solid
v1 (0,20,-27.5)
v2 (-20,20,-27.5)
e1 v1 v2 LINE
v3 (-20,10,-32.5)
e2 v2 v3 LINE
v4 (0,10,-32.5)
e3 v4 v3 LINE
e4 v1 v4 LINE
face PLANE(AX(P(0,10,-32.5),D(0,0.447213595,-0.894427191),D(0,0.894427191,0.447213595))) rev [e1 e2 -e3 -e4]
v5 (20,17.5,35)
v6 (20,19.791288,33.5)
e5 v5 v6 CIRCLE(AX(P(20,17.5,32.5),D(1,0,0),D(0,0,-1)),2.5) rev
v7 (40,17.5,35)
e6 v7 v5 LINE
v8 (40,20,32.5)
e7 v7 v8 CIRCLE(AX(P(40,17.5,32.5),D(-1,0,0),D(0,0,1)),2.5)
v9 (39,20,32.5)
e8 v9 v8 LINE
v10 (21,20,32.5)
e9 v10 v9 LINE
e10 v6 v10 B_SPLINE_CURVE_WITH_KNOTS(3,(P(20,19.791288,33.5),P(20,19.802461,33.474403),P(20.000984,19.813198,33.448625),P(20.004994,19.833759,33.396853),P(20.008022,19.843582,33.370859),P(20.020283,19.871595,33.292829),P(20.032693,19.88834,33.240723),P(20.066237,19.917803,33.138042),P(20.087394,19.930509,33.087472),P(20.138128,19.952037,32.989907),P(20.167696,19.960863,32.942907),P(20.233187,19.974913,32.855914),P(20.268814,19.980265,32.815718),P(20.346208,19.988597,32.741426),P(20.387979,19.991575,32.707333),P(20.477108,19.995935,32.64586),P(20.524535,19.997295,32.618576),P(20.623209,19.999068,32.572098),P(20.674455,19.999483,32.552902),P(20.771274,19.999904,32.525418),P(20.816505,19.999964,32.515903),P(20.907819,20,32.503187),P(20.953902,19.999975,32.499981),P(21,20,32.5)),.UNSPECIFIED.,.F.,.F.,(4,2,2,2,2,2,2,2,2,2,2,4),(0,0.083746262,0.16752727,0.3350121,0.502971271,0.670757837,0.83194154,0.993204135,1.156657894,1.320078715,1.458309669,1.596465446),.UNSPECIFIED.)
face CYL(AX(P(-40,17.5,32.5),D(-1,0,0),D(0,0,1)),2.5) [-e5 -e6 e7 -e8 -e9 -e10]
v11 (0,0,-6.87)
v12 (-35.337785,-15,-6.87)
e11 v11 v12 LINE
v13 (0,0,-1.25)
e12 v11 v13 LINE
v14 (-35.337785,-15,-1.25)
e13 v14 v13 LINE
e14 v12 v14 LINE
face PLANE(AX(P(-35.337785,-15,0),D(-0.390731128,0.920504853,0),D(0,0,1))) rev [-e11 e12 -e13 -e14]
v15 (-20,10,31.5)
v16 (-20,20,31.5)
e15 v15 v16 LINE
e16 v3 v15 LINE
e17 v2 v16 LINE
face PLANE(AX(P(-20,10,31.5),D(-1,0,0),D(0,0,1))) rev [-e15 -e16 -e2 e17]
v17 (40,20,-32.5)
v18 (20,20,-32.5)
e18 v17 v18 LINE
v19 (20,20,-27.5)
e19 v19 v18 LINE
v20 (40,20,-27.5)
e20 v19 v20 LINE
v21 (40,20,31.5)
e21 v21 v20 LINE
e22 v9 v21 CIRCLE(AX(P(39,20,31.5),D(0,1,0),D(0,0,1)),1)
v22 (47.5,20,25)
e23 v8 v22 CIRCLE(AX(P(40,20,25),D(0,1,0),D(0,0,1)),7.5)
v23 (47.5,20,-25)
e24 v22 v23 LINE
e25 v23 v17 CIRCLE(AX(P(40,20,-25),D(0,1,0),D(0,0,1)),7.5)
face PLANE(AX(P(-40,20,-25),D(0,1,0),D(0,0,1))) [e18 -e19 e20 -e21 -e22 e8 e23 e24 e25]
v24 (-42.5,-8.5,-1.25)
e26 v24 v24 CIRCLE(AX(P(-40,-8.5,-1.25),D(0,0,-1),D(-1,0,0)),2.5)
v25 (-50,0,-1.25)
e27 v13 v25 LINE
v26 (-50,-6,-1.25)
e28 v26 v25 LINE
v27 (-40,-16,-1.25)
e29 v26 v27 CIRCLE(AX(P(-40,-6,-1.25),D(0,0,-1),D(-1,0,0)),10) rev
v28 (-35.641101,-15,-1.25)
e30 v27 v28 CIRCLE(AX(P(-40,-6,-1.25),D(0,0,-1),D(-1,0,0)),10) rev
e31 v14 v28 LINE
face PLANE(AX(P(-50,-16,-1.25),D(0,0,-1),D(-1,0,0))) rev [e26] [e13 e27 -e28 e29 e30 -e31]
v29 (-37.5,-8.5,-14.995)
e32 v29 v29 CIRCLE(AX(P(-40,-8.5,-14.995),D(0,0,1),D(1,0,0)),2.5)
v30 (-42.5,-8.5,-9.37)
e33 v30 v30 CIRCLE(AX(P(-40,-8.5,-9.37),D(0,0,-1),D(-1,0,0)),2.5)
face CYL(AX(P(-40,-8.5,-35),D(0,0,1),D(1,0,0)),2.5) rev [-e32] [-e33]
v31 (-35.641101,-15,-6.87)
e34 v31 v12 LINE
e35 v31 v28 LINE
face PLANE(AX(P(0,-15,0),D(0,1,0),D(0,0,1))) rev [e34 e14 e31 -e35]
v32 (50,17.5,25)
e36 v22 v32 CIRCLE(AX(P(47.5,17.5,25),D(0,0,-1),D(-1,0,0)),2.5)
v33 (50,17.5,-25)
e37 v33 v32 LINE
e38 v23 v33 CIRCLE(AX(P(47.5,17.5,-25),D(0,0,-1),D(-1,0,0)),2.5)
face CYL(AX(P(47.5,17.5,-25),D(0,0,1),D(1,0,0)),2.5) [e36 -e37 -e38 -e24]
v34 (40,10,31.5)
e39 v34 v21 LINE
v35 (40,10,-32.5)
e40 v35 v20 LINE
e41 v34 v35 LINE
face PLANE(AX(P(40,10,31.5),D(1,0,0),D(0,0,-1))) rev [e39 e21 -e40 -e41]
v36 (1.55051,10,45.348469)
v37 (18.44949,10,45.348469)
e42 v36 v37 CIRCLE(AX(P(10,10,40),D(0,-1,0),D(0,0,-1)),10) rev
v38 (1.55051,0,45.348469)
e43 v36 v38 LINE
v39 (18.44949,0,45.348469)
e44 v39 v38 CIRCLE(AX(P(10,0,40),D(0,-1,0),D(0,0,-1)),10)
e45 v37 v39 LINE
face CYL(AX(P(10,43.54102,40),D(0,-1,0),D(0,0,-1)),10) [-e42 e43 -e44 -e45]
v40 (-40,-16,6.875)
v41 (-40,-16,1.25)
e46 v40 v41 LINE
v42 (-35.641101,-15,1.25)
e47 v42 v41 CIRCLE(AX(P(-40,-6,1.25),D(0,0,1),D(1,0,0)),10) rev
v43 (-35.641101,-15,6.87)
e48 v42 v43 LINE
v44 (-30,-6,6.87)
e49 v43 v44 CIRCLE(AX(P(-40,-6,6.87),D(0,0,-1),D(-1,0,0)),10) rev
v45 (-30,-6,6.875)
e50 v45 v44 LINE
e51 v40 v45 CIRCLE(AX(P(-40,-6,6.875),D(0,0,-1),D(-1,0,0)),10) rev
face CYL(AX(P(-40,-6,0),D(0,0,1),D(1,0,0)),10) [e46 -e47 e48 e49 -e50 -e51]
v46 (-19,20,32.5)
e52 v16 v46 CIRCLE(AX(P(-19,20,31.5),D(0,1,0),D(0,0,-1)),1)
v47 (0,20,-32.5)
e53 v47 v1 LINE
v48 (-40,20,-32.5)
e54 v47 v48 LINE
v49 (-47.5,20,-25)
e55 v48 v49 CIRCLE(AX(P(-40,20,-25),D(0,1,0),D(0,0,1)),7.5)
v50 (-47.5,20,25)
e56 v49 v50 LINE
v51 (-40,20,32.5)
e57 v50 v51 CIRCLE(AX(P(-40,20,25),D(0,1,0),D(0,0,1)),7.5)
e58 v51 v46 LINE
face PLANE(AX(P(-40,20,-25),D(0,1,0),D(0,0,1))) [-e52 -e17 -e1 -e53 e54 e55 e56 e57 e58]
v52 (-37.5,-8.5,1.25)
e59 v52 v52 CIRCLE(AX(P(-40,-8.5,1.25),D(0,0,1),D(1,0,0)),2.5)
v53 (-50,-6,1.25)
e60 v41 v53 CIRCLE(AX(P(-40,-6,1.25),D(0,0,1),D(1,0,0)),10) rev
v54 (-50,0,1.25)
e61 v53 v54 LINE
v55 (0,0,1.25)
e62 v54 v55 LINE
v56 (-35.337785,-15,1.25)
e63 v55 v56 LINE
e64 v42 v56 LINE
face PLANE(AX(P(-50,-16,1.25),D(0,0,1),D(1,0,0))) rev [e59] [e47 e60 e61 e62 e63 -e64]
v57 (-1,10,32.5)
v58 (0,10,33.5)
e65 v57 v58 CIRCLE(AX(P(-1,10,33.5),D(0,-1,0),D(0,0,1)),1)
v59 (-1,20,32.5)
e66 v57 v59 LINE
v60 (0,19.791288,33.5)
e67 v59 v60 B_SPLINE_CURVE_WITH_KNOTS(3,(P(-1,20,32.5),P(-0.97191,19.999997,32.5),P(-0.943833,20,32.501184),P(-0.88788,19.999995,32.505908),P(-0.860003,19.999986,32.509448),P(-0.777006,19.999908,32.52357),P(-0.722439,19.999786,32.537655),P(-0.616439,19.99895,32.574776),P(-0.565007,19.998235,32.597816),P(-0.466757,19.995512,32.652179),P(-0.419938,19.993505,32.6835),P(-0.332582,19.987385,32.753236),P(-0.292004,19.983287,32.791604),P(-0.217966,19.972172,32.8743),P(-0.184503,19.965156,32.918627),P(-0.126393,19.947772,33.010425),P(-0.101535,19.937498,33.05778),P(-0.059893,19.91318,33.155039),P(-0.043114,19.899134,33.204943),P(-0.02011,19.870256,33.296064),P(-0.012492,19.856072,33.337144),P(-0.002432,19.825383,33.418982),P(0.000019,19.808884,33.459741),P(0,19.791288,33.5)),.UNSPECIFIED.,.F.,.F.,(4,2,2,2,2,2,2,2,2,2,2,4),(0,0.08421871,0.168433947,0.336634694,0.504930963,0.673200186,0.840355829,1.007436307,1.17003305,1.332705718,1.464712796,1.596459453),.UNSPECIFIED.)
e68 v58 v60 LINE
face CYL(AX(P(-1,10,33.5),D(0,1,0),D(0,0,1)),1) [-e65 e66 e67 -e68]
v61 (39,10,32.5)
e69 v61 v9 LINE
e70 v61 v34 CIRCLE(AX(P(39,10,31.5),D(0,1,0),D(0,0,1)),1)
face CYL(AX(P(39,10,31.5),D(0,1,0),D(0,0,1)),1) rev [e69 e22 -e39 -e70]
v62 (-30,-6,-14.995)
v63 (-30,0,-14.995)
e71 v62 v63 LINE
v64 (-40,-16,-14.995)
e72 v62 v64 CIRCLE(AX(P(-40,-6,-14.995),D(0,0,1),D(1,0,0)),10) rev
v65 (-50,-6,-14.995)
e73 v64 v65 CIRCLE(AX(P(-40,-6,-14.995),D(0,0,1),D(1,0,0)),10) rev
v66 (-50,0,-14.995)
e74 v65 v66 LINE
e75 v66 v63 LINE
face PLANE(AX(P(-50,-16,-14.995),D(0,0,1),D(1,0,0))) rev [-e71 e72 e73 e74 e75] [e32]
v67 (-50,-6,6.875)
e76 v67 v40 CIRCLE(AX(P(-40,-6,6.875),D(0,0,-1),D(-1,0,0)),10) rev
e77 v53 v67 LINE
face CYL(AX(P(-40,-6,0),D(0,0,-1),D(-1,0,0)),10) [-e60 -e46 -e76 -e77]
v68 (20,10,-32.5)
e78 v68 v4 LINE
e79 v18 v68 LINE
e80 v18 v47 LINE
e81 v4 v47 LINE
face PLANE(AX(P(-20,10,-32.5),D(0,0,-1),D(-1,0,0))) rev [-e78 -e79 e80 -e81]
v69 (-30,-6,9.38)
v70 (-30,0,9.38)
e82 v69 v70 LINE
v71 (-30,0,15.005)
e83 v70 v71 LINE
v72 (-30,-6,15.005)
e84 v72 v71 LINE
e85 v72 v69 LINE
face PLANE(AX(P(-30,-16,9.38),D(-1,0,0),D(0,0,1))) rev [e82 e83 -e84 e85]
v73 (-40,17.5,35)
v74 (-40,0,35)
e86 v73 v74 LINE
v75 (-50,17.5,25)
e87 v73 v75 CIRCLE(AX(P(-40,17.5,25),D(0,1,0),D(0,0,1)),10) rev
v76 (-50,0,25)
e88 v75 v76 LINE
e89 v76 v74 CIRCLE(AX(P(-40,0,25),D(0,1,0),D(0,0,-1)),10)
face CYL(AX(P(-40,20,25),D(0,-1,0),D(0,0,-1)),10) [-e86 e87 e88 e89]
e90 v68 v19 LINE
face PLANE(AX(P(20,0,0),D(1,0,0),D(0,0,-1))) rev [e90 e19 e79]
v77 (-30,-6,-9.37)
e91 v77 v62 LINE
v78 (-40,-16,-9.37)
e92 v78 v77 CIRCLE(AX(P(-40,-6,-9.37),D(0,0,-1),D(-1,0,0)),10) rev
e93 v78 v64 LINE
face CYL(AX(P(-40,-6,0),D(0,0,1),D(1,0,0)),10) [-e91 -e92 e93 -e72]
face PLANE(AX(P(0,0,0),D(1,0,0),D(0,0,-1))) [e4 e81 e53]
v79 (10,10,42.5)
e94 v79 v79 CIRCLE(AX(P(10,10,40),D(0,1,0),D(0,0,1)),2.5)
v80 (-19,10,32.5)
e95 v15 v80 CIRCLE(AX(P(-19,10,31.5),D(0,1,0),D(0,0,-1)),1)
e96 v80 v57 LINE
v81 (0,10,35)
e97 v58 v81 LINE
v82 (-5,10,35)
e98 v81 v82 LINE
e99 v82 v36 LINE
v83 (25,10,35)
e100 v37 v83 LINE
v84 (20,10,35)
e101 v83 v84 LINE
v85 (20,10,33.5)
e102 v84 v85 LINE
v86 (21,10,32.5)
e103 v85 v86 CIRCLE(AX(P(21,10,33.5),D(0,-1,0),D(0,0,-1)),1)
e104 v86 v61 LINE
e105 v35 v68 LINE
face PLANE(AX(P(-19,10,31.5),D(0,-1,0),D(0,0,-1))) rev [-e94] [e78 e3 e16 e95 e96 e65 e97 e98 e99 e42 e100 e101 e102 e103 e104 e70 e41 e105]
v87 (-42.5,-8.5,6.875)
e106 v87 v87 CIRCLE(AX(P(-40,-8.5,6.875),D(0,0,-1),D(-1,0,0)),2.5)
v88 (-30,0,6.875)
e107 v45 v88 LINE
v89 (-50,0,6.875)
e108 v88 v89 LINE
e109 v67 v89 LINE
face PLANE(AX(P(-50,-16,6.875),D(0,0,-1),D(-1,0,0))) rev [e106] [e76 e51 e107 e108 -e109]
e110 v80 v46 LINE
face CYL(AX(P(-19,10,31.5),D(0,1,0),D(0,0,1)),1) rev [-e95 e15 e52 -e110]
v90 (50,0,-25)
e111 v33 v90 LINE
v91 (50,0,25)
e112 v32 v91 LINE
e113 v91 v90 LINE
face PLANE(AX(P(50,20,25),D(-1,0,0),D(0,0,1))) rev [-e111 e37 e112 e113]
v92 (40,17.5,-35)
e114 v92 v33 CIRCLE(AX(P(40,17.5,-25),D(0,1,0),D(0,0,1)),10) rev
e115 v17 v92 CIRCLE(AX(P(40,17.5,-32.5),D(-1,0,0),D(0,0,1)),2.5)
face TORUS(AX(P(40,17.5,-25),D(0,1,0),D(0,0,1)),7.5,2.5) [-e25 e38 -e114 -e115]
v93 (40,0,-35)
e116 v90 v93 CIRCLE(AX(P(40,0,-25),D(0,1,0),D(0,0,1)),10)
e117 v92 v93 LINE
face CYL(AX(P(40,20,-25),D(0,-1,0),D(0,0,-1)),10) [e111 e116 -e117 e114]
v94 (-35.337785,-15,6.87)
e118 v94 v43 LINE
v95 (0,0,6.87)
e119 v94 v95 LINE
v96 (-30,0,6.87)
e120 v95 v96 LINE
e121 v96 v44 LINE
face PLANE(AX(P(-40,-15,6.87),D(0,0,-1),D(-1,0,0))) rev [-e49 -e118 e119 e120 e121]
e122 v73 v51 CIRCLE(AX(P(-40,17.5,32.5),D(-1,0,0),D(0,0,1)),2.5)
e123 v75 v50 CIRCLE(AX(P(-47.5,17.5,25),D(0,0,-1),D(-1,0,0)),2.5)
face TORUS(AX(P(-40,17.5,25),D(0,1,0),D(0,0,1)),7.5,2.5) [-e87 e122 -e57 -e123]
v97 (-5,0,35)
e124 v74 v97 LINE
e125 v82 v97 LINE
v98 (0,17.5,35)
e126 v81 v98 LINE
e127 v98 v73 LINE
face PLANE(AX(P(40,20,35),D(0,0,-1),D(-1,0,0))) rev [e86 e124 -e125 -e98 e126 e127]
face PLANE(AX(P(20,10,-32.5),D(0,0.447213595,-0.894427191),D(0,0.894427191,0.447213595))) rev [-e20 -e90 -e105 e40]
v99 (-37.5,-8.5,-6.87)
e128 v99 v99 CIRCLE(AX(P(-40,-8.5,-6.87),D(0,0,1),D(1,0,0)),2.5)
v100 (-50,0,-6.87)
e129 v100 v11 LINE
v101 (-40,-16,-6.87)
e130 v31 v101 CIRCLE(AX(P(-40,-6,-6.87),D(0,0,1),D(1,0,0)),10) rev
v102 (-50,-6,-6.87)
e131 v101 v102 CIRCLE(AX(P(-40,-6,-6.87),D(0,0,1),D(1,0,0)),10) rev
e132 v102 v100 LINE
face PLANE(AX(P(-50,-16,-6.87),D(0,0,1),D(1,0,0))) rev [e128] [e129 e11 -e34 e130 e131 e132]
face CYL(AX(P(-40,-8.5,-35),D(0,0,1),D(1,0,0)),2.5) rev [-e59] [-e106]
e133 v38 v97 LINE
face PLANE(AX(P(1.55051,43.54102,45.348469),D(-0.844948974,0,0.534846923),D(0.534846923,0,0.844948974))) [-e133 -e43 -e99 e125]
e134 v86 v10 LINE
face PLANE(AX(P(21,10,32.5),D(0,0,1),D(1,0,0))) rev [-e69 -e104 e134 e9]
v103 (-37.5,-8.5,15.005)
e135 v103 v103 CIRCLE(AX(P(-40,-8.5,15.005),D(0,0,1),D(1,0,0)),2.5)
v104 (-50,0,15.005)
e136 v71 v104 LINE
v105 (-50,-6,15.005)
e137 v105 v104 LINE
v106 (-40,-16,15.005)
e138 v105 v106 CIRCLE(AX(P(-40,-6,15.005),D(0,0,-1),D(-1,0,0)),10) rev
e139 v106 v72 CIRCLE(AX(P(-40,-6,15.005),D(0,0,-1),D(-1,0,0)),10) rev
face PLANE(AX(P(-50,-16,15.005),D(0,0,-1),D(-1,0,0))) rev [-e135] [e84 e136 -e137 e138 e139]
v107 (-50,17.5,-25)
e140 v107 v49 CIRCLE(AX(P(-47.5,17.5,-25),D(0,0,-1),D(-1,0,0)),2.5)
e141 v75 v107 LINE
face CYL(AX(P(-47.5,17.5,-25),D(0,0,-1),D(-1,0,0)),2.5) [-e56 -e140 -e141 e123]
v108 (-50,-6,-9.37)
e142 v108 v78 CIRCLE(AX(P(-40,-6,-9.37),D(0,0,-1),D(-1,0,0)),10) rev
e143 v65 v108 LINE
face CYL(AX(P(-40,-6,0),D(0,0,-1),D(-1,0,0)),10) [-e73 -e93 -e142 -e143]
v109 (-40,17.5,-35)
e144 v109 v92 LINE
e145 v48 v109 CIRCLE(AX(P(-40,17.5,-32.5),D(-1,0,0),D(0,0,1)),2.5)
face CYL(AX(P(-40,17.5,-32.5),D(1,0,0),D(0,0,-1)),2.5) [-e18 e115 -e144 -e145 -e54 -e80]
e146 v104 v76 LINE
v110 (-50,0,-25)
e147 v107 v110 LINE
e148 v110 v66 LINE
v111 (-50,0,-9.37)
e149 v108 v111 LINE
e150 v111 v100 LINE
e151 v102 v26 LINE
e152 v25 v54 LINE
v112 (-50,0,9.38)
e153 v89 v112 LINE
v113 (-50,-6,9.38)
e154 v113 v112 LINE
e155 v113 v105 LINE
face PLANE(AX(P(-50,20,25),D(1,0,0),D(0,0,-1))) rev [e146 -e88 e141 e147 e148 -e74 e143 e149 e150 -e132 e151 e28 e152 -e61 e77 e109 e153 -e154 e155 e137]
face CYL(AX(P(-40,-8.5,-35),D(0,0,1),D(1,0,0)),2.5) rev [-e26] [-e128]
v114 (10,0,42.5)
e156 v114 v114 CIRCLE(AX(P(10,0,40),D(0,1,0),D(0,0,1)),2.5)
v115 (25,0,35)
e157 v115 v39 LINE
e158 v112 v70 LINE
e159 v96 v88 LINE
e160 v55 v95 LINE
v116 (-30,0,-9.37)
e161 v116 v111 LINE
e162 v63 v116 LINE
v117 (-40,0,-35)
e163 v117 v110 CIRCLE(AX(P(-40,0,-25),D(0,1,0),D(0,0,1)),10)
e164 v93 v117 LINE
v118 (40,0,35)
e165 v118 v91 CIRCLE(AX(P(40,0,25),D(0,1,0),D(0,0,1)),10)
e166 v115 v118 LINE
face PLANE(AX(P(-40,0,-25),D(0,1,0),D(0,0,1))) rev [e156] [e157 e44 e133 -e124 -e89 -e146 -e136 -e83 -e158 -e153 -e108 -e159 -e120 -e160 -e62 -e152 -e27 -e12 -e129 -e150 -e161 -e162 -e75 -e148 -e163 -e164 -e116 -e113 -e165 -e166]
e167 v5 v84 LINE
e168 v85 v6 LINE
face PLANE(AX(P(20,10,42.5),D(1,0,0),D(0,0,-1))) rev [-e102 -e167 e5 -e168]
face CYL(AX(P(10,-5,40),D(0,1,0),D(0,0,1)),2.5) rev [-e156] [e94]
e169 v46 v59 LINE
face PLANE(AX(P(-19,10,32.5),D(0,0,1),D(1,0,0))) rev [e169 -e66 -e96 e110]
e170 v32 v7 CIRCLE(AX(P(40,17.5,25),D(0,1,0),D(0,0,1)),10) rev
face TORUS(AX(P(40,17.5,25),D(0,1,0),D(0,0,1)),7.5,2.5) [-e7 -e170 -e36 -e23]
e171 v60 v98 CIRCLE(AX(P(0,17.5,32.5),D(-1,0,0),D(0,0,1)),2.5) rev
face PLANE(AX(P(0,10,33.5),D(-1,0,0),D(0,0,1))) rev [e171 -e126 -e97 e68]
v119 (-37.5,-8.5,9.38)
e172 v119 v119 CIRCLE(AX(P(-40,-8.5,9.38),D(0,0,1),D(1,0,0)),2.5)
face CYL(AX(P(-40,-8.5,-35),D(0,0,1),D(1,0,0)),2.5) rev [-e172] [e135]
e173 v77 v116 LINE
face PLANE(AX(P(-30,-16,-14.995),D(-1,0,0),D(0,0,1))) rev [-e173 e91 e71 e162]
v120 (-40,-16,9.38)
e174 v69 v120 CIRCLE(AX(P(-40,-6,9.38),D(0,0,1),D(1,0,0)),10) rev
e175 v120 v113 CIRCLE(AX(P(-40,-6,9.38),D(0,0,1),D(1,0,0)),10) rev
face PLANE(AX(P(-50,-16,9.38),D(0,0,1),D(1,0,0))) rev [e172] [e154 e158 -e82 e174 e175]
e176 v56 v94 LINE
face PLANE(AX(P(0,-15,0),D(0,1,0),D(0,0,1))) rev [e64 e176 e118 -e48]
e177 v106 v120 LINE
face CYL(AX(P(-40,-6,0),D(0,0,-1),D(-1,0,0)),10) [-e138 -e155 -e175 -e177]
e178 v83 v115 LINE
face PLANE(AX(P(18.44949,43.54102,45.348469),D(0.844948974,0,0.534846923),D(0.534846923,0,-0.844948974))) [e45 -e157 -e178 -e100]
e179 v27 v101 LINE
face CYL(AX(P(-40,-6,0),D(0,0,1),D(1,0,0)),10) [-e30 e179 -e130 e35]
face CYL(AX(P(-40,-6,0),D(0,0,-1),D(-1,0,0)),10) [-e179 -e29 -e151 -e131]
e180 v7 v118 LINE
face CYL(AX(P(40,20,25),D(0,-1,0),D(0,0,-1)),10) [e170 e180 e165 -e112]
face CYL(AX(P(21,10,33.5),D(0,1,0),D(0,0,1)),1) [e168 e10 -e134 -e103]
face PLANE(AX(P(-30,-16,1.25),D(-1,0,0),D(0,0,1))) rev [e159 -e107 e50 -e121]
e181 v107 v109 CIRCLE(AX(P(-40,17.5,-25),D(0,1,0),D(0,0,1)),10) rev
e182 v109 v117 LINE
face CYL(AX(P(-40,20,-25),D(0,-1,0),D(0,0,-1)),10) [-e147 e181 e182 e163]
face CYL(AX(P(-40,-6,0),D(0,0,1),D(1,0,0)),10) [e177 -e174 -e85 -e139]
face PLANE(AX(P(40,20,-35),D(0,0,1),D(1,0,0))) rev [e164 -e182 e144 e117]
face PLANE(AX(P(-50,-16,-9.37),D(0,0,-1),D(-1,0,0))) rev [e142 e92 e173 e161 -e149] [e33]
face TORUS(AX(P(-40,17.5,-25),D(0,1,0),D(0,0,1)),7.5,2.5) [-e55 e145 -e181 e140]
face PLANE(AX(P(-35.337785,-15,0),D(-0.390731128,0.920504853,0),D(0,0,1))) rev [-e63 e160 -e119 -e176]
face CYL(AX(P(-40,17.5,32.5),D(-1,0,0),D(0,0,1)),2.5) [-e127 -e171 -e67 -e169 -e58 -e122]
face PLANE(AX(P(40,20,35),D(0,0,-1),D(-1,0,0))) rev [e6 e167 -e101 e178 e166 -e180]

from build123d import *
from OCP.BRepFilletAPI import BRepFilletAPI_MakeChamfer

# Parameters (mm, degrees)
BOSS_EXTRUDE1_DEPTH = 20
FILLET1_R           = 2.5
SKETCH3_W           = 20
SKETCH3_H           = 5.625
SKETCH3_H_2         = 5.62
BOSS_EXTRUDE2_DEPTH = 16
FILLET2_R           = 10
SKETCH4_R           = 2.5
CUT_EXTRUDE1_DEPTH  = 74.488094444
SKETCH5_W           = 40
SKETCH5_H           = 5.62
BOSS_EXTRUDE3_DEPTH = 15
CHAMFER1_SIZE       = 35.337785487
CHAMFER1_SIZE_2     = 15
SKETCH6_R           = 2.5
CUT_EXTRUDE2_DEPTH  = 74.488094444
CUT_EXTRUDE3_DEPTH  = 10
BOSS_EXTRUDE4_DEPTH = 20
BOSS_EXTRUDE5_DEPTH = 20
BOSS_EXTRUDE6_DEPTH = 10
SKETCH12_R          = 2.5
CUT_EXTRUDE5_DEPTH  = 15


with BuildPart() as part:
    # Sketch1 → Boss-Extrude1 (new body)
    with BuildSketch(Plane(origin=(0, 0, 0), x_dir=(1, 0, 0), z_dir=(0, 1, 0))):
        with BuildLine():
            Line((40, -35), (-40, -35))
            ThreePointArc((-40, -35), (-47.071067812, -32.071067812), (-50, -25))
            Line((-50, -25), (-50, 25))
            ThreePointArc((-50, 25), (-47.071067812, 32.071067812), (-40, 35))
            Line((-40, 35), (40, 35))
            ThreePointArc((40, 35), (47.071067812, 32.071067812), (50, 25))
            Line((50, 25), (50, -25))
            ThreePointArc((50, -25), (47.071067812, -32.071067812), (40, -35))
        make_face()
    extrude(amount=BOSS_EXTRUDE1_DEPTH)

    # Fillet1
    fillet1_edges = [part.edges().sort_by_distance(p)[0] for p in [
        (-47.071067812, 20, 32.071067812),
        (0, 20, 35),
        (47.071067812, 20, 32.071067812),
        (50, 20, 0),
        (47.071067812, 20, -32.071067812),
        (0, 20, -35),
        (-47.071067812, 20, -32.071067812),
        (-50, 20, 0),
    ]]
    fillet(fillet1_edges, radius=FILLET1_R)

    # Sketch3 → Boss-Extrude2 (add)
    with BuildSketch(Plane.XZ):
        with Locations((-40, 4.0625)):
            Rectangle(SKETCH3_W, SKETCH3_H)
        with Locations((-40, 12.1925)):
            Rectangle(SKETCH3_W, SKETCH3_H)
        with Locations((-40, -12.1825)):
            Rectangle(SKETCH3_W, SKETCH3_H)
        with Locations((-40, -4.06)):
            Rectangle(SKETCH3_W, SKETCH3_H_2)
    extrude(amount=BOSS_EXTRUDE2_DEPTH)

    # Fillet2
    fillet2_edges = [part.edges().sort_by_distance(p)[0] for p in [
        (-30, -16, -12.1825),
        (-30, -16, -4.06),
        (-30, -16, 4.0625),
        (-30, -16, 12.1925),
        (-50, -16, -12.1825),
        (-50, -16, -4.06),
        (-50, -16, 4.0625),
        (-50, -16, 12.1925),
    ]]
    fillet(fillet2_edges, radius=FILLET2_R - 0.0001)  # a hair under: the kernel refuses the full size

    # Sketch4 → Cut-Extrude1 (cut, through all)
    with BuildSketch(Plane.XY.offset(15.005)):
        with Locations((-40, -8.5)):
            Circle(SKETCH4_R)
    extrude(amount=-CUT_EXTRUDE1_DEPTH, mode=Mode.SUBTRACT)

    # Sketch5 → Boss-Extrude3 (add)
    with BuildSketch(Plane.XZ):
        with Locations((-20, 4.06)):
            Rectangle(SKETCH5_W, SKETCH5_H)
        with Locations((-20, -4.06)):
            Rectangle(SKETCH5_W, SKETCH5_H)
    extrude(amount=BOSS_EXTRUDE3_DEPTH)

    # Chamfer1
    chamfer1_edges_1 = [part.edges().sort_by_distance(p)[0] for p in [
        (0, -15, -4.06),
    ]]
    chamfer1_side_1 = [part.faces().sort_by_distance(p)[0] for p in [
        (-0.3, -15, -4.06),
    ]]
    chamfer1_edges_2 = [part.edges().sort_by_distance(p)[0] for p in [
        (0, -15, 4.06),
    ]]
    chamfer1_side_2 = [part.faces().sort_by_distance(p)[0] for p in [
        (0, -14.7, 4.06),
    ]]
    chamfer1 = BRepFilletAPI_MakeChamfer(part.part.solid().wrapped)
    for e in chamfer1_edges_1:
        chamfer1.Add(CHAMFER1_SIZE - 0.0001, CHAMFER1_SIZE_2 - 0.0001, e.wrapped, chamfer1_side_1[0].wrapped)
    for e in chamfer1_edges_2:
        chamfer1.Add(CHAMFER1_SIZE_2 - 0.0001, CHAMFER1_SIZE - 0.0001, e.wrapped, chamfer1_side_2[0].wrapped)
    add(Compound.cast(chamfer1.Shape()), mode=Mode.REPLACE)  # a hair under: the kernel refuses the full size

    # Sketch6 → Cut-Extrude2 (cut, through all)
    with BuildSketch(Plane.XY.offset(15.005)):
        with Locations((-40, -8.5)):
            Circle(SKETCH6_R)
    extrude(amount=-CUT_EXTRUDE2_DEPTH, mode=Mode.SUBTRACT)

    # Sketch7 → Cut-Extrude3 (cut)
    with BuildSketch(Plane(origin=(0, 20, 0), x_dir=(1, 0, 0), z_dir=(0, 1, 0))):
        with BuildLine():
            Line((0, -33.5), (0, -42.5))
            Line((0, -42.5), (20, -42.5))
            Line((20, -42.5), (20, -33.5))
            ThreePointArc((20, -33.5), (20.292893219, -32.792893219), (21, -32.5))
            Line((21, -32.5), (39, -32.5))
            ThreePointArc((39, -32.5), (39.707106781, -32.207106781), (40, -31.5))
            Line((40, -31.5), (40, 32.5))
            Line((40, 32.5), (-20, 32.5))
            Line((-20, 32.5), (-20, -31.5))
            ThreePointArc((-20, -31.5), (-19.707106781, -32.207106781), (-19, -32.5))
            Line((-19, -32.5), (-1, -32.5))
            ThreePointArc((-1, -32.5), (-0.292893219, -32.792893219), (0, -33.5))
        make_face()
    extrude(amount=-CUT_EXTRUDE3_DEPTH, mode=Mode.SUBTRACT)

    # Sketch8 → Boss-Extrude4 (add)
    with BuildSketch(Plane(origin=(-20, 0, 0), x_dir=(0, 0, -1), z_dir=(1, 0, 0))):
        Polygon((32.5, 10), (27.5, 20), (32.5, 20), align=None)
    extrude(amount=BOSS_EXTRUDE4_DEPTH)

    # Sketch9 → Boss-Extrude5 (add)
    with BuildSketch(Plane.ZY.offset(-40)):
        Polygon((-32.5, 10), (-27.5, 20), (-32.5, 20), align=None)
    extrude(amount=BOSS_EXTRUDE5_DEPTH)

    # Sketch10 → Boss-Extrude6 (add)
    with BuildSketch(Plane.XZ):
        with BuildLine():
            Line((-5, 35), (25, 35))
            Line((25, 35), (18.449489743, 45.348469228))
            ThreePointArc((18.449489743, 45.348469228), (10, 50), (1.550510257, 45.348469228))
            Line((1.550510257, 45.348469228), (-5, 35))
        make_face()
    extrude(amount=-BOSS_EXTRUDE6_DEPTH)

    # Sketch12 → Cut-Extrude5 (cut)
    with BuildSketch(Plane(origin=(0, 10, 0), x_dir=(1, 0, 0), z_dir=(0, 1, 0))):
        with Locations(Location((10, -40, 0), (0, 0, 270))):
            Circle(SKETCH12_R)
    extrude(amount=-CUT_EXTRUDE5_DEPTH, mode=Mode.SUBTRACT)


solid = part.part
